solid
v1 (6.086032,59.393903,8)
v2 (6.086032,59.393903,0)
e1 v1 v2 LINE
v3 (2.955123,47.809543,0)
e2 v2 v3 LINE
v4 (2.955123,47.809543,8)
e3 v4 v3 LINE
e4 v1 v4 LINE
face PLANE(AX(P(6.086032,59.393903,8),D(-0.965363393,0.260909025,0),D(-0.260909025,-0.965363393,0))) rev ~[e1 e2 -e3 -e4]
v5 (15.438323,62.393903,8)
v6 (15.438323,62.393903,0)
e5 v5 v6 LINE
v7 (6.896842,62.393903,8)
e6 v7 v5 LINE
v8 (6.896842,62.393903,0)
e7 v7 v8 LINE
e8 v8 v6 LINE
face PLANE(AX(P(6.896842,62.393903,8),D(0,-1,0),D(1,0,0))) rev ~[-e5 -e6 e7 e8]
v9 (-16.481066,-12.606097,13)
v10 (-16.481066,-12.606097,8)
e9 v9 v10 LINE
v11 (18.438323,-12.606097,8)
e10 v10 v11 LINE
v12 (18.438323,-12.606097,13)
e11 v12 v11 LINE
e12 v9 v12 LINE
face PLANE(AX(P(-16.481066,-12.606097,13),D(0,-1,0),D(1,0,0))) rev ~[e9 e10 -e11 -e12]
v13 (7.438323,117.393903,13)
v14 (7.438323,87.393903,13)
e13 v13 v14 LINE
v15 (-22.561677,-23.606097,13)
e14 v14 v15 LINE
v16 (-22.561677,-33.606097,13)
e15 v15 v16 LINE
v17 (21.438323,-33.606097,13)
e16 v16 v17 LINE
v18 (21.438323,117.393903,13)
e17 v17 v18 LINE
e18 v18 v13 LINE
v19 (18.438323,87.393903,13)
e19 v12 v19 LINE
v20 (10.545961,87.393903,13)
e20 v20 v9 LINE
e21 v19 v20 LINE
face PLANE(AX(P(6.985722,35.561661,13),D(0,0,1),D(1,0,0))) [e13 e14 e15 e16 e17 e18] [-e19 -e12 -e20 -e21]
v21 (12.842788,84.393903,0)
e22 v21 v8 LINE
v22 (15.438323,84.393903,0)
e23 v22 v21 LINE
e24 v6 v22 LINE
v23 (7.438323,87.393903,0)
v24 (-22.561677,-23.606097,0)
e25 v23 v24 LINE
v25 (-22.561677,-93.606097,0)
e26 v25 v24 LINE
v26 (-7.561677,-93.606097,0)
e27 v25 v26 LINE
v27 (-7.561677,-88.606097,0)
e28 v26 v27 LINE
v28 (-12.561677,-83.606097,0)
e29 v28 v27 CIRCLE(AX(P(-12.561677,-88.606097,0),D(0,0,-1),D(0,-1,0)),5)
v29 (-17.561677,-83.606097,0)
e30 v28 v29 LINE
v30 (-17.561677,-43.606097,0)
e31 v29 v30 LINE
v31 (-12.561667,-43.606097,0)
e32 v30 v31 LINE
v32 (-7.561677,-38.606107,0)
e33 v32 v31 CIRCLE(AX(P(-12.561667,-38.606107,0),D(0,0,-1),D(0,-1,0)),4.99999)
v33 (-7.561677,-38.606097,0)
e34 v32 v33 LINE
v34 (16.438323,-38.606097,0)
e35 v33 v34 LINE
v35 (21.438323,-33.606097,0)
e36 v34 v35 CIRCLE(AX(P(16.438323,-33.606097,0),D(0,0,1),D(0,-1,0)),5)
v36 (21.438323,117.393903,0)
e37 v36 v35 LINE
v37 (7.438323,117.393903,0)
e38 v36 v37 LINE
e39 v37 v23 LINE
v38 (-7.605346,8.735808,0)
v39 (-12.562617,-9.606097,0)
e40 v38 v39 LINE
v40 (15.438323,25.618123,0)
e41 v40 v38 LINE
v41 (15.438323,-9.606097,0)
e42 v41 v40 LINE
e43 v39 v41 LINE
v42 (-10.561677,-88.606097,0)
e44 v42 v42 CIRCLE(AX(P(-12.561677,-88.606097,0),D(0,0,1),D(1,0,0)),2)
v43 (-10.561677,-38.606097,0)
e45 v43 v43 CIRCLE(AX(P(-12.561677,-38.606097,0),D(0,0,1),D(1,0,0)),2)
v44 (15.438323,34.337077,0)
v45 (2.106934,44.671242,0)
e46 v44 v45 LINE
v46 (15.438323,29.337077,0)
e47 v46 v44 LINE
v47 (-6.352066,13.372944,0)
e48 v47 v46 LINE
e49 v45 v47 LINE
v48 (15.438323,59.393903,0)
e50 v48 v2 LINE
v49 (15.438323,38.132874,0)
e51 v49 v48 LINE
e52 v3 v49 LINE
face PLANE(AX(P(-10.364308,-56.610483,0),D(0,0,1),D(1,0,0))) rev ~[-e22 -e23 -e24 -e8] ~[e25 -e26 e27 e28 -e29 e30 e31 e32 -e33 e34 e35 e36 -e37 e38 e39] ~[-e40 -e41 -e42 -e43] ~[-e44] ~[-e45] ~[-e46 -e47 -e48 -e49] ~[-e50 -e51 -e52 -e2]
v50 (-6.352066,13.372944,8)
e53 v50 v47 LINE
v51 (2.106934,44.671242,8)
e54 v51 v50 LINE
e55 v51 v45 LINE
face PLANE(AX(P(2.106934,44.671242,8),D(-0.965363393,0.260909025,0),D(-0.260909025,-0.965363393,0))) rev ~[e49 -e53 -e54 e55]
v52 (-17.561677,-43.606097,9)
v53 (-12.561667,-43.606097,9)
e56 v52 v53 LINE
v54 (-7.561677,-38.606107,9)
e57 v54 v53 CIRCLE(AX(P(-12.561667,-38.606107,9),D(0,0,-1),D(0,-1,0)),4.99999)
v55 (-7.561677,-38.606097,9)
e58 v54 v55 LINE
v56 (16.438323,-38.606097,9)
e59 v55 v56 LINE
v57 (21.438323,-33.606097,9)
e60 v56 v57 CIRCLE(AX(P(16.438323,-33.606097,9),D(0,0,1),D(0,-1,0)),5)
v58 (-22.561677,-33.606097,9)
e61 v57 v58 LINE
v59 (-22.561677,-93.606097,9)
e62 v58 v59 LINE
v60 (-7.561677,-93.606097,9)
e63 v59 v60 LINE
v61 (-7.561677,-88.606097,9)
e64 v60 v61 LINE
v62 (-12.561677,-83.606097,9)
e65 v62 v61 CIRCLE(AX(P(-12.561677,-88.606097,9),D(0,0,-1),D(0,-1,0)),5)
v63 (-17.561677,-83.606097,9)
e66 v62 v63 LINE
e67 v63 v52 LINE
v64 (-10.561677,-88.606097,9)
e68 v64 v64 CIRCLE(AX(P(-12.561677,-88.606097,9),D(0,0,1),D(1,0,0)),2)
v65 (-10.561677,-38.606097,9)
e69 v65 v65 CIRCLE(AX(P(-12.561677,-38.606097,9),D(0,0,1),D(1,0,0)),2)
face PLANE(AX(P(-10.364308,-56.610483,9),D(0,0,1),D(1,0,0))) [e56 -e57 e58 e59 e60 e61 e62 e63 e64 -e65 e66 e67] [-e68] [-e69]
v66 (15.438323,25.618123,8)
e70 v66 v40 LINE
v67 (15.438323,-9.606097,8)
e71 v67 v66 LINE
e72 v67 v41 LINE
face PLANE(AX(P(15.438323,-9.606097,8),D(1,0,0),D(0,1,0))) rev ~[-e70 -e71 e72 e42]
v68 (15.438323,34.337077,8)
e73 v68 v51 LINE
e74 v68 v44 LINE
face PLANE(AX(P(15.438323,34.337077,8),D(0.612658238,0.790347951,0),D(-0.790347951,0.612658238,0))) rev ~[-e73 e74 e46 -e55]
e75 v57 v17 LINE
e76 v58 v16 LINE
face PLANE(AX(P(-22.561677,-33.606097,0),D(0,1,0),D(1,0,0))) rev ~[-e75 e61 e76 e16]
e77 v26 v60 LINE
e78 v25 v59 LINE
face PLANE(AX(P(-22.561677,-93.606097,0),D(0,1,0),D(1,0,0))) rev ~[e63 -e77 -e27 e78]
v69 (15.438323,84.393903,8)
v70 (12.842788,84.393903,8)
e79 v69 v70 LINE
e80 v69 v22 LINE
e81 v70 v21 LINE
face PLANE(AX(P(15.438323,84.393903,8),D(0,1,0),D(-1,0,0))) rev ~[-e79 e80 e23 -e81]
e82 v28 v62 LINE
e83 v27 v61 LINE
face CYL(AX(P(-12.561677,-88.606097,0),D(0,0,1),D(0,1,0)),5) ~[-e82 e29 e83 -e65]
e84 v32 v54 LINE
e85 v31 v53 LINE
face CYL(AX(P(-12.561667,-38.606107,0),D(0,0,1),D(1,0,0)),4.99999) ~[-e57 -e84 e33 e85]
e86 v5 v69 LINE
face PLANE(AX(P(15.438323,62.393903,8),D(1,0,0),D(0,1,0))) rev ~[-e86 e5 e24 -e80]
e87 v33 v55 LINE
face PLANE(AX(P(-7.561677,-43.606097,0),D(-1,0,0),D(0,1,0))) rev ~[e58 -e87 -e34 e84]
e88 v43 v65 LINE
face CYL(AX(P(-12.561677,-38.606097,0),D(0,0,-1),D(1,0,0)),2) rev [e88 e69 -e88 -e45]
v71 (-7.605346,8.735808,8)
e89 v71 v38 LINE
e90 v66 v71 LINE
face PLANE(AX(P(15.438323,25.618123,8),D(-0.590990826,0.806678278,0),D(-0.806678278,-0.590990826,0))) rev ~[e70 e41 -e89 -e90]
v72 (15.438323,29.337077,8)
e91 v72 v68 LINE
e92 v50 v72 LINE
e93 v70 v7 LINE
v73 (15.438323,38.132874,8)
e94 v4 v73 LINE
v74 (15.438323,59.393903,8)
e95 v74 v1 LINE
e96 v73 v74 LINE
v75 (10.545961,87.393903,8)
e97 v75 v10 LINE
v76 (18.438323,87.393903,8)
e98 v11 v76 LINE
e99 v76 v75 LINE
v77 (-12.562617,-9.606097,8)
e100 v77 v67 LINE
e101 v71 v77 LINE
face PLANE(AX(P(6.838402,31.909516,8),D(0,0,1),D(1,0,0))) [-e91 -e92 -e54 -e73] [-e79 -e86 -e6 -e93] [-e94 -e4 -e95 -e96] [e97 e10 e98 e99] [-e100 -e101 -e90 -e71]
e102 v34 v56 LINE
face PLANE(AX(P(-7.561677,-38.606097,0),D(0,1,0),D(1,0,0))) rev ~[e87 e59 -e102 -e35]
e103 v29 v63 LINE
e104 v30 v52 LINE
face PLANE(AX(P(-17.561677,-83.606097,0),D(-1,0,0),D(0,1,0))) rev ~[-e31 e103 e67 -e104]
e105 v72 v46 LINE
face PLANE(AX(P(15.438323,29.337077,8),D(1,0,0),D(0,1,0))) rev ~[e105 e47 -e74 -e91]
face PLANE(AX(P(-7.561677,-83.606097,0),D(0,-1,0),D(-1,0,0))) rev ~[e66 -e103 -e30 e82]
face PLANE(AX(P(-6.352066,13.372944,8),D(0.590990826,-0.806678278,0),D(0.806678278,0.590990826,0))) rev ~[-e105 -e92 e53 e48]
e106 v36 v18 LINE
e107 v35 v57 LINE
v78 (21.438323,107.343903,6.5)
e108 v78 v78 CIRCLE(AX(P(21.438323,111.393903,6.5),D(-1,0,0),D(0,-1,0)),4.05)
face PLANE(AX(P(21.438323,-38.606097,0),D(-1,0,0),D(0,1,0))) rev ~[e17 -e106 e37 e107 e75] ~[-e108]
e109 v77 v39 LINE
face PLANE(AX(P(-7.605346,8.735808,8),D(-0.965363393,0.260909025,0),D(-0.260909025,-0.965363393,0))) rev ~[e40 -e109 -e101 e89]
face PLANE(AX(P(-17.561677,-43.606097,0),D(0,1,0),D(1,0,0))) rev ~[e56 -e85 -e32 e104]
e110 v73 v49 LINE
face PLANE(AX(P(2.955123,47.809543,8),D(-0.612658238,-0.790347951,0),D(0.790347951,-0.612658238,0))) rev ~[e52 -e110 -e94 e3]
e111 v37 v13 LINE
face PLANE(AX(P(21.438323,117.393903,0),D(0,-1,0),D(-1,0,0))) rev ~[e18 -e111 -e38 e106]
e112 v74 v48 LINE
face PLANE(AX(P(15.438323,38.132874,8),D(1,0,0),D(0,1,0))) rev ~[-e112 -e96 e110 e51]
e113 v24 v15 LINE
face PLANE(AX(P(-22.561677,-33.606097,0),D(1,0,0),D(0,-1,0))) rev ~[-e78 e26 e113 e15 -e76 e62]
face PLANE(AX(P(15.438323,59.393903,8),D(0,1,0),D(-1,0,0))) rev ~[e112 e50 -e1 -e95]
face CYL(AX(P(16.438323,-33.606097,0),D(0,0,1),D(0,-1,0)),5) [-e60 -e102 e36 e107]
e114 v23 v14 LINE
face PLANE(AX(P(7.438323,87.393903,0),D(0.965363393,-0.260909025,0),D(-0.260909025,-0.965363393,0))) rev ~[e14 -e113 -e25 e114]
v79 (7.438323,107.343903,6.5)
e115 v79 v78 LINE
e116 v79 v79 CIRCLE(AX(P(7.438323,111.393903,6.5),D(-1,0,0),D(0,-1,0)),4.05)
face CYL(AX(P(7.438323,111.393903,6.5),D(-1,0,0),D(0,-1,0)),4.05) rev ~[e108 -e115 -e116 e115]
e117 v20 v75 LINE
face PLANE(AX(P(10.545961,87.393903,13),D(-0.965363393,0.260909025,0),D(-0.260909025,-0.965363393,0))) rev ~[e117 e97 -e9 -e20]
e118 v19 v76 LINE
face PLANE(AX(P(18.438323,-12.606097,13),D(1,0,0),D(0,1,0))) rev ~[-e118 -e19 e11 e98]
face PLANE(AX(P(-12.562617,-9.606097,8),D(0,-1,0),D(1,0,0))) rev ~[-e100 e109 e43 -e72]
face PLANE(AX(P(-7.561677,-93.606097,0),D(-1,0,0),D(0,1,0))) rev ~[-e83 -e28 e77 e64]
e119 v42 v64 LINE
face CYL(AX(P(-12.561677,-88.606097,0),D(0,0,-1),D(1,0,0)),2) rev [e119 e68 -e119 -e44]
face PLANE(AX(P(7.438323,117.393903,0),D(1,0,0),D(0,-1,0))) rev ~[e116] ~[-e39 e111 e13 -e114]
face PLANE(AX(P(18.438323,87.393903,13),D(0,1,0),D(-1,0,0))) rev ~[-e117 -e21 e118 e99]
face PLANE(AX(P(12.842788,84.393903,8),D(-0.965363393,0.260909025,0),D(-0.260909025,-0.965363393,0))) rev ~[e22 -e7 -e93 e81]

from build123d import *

# Parameters (mm, degrees)
F1_DEPTH  = 13
F0_R      = 2
F2_DEPTH  = 9
F4_DEPTH  = 5
F6_DEPTH  = 8.001
F7_R      = 5
F8_R      = 4.99999
F9_R      = 5
F10_R     = 4.05
F11_DEPTH = 14.001


# Not quite as in the source:
# - a fillet or chamfer is up to 0.001 mm smaller than in the source, because OpenCascade refuses the exact size


with BuildPart() as f1:
    # F0 (on Top) → F1 (new body)
    with BuildSketch(Plane.XY):
        Polygon((-22.5616768954, -33.6060966955), (21.4383231046, -33.6060966955), (21.4383231046, 117.3939033045), (7.4383231046, 117.3939033045), (7.4383231046, 87.3939033045), (-22.5616768954, -23.6060966955), align=None)
    extrude(amount=F1_DEPTH)

    # F0 (on Top) → F2 (join)
    with BuildSketch(Plane.XY):
        Polygon((-17.5616768954, -43.6060966955), (-7.5616768954, -43.6060966955), (-7.5616768954, -38.6060966955), (21.4383231046, -38.6060966955), (21.4383231046, -33.6060966955), (-22.5616768954, -33.6060966955), (-22.5616768954, -93.6060966955), (-7.5616768954, -93.6060966955), (-7.5616768954, -83.6060966955), (-17.5616768954, -83.6060966955), align=None)
        with Locations((-12.5616768954, -88.6060966955)):
            Circle(F0_R, mode=Mode.SUBTRACT)
        with Locations((-12.5616768954, -38.6060966955)):
            Circle(F0_R, mode=Mode.SUBTRACT)
    extrude(amount=F2_DEPTH)

    # F3 (on face) → F4 (cut)
    with BuildSketch(Plane.XY.offset(13)):
        Polygon((-16.4810658851, -12.6060966955), (18.4383231046, -12.6060966955), (18.4383231046, 87.3939033045), (10.545961142, 87.3939033045), align=None)
    extrude(amount=-F4_DEPTH, mode=Mode.SUBTRACT)

    # F5 (on face) → F6 (cut, through all)
    with BuildSketch(Plane.XY.offset(8)):
        Polygon((15.4383231046, 62.3939033045), (15.4383231046, 84.3939033045), (12.8427883685, 84.3939033045), (6.8968424225, 62.3939033045), align=None)
        Polygon((15.4383231046, 38.1328739976), (15.4383231046, 59.3939033045), (6.0860316117, 59.3939033045), (2.95512331, 47.8095425882), align=None)
        Polygon((15.4383231046, 29.3370774792), (15.4383231046, 34.3370774792), (2.1069338573, 44.6712416135), (-6.3520655178, 13.3729439254), align=None)
        Polygon((15.4383231046, -9.6060966955), (15.4383231046, 25.6181227456), (-7.6053455592, 8.7358077721), (-12.562617037, -9.6060966955), align=None)
    extrude(amount=-F6_DEPTH, mode=Mode.SUBTRACT)

    # F7
    f7_edges = [f1.edges().sort_by_distance(p)[0] for p in [
        (21.438323, -38.606097, 4.5),
    ]]
    fillet(f7_edges, radius=F7_R)

    # F8 (radius 5 in the source; OpenCascade refuses exactly that, so slightly less here)
    f8_edges = [f1.edges().sort_by_distance(p)[0] for p in [
        (-7.561677, -43.606097, 4.5),
    ]]
    fillet(f8_edges, radius=F8_R)

    # F9
    f9_edges = [f1.edges().sort_by_distance(p)[0] for p in [
        (-7.561677, -83.606097, 4.5),
    ]]
    fillet(f9_edges, radius=F9_R)

    # F10 (on face) → F11 (cut, through all)
    with BuildSketch(Plane(origin=(7.4383231046, 0, 0), x_dir=(0, -1, 0), z_dir=(-1, 0, 0))):
        with Locations((-111.3939033045, 6.5)):
            Circle(F10_R)
    extrude(amount=-F11_DEPTH, mode=Mode.SUBTRACT)


solid = f1.part
